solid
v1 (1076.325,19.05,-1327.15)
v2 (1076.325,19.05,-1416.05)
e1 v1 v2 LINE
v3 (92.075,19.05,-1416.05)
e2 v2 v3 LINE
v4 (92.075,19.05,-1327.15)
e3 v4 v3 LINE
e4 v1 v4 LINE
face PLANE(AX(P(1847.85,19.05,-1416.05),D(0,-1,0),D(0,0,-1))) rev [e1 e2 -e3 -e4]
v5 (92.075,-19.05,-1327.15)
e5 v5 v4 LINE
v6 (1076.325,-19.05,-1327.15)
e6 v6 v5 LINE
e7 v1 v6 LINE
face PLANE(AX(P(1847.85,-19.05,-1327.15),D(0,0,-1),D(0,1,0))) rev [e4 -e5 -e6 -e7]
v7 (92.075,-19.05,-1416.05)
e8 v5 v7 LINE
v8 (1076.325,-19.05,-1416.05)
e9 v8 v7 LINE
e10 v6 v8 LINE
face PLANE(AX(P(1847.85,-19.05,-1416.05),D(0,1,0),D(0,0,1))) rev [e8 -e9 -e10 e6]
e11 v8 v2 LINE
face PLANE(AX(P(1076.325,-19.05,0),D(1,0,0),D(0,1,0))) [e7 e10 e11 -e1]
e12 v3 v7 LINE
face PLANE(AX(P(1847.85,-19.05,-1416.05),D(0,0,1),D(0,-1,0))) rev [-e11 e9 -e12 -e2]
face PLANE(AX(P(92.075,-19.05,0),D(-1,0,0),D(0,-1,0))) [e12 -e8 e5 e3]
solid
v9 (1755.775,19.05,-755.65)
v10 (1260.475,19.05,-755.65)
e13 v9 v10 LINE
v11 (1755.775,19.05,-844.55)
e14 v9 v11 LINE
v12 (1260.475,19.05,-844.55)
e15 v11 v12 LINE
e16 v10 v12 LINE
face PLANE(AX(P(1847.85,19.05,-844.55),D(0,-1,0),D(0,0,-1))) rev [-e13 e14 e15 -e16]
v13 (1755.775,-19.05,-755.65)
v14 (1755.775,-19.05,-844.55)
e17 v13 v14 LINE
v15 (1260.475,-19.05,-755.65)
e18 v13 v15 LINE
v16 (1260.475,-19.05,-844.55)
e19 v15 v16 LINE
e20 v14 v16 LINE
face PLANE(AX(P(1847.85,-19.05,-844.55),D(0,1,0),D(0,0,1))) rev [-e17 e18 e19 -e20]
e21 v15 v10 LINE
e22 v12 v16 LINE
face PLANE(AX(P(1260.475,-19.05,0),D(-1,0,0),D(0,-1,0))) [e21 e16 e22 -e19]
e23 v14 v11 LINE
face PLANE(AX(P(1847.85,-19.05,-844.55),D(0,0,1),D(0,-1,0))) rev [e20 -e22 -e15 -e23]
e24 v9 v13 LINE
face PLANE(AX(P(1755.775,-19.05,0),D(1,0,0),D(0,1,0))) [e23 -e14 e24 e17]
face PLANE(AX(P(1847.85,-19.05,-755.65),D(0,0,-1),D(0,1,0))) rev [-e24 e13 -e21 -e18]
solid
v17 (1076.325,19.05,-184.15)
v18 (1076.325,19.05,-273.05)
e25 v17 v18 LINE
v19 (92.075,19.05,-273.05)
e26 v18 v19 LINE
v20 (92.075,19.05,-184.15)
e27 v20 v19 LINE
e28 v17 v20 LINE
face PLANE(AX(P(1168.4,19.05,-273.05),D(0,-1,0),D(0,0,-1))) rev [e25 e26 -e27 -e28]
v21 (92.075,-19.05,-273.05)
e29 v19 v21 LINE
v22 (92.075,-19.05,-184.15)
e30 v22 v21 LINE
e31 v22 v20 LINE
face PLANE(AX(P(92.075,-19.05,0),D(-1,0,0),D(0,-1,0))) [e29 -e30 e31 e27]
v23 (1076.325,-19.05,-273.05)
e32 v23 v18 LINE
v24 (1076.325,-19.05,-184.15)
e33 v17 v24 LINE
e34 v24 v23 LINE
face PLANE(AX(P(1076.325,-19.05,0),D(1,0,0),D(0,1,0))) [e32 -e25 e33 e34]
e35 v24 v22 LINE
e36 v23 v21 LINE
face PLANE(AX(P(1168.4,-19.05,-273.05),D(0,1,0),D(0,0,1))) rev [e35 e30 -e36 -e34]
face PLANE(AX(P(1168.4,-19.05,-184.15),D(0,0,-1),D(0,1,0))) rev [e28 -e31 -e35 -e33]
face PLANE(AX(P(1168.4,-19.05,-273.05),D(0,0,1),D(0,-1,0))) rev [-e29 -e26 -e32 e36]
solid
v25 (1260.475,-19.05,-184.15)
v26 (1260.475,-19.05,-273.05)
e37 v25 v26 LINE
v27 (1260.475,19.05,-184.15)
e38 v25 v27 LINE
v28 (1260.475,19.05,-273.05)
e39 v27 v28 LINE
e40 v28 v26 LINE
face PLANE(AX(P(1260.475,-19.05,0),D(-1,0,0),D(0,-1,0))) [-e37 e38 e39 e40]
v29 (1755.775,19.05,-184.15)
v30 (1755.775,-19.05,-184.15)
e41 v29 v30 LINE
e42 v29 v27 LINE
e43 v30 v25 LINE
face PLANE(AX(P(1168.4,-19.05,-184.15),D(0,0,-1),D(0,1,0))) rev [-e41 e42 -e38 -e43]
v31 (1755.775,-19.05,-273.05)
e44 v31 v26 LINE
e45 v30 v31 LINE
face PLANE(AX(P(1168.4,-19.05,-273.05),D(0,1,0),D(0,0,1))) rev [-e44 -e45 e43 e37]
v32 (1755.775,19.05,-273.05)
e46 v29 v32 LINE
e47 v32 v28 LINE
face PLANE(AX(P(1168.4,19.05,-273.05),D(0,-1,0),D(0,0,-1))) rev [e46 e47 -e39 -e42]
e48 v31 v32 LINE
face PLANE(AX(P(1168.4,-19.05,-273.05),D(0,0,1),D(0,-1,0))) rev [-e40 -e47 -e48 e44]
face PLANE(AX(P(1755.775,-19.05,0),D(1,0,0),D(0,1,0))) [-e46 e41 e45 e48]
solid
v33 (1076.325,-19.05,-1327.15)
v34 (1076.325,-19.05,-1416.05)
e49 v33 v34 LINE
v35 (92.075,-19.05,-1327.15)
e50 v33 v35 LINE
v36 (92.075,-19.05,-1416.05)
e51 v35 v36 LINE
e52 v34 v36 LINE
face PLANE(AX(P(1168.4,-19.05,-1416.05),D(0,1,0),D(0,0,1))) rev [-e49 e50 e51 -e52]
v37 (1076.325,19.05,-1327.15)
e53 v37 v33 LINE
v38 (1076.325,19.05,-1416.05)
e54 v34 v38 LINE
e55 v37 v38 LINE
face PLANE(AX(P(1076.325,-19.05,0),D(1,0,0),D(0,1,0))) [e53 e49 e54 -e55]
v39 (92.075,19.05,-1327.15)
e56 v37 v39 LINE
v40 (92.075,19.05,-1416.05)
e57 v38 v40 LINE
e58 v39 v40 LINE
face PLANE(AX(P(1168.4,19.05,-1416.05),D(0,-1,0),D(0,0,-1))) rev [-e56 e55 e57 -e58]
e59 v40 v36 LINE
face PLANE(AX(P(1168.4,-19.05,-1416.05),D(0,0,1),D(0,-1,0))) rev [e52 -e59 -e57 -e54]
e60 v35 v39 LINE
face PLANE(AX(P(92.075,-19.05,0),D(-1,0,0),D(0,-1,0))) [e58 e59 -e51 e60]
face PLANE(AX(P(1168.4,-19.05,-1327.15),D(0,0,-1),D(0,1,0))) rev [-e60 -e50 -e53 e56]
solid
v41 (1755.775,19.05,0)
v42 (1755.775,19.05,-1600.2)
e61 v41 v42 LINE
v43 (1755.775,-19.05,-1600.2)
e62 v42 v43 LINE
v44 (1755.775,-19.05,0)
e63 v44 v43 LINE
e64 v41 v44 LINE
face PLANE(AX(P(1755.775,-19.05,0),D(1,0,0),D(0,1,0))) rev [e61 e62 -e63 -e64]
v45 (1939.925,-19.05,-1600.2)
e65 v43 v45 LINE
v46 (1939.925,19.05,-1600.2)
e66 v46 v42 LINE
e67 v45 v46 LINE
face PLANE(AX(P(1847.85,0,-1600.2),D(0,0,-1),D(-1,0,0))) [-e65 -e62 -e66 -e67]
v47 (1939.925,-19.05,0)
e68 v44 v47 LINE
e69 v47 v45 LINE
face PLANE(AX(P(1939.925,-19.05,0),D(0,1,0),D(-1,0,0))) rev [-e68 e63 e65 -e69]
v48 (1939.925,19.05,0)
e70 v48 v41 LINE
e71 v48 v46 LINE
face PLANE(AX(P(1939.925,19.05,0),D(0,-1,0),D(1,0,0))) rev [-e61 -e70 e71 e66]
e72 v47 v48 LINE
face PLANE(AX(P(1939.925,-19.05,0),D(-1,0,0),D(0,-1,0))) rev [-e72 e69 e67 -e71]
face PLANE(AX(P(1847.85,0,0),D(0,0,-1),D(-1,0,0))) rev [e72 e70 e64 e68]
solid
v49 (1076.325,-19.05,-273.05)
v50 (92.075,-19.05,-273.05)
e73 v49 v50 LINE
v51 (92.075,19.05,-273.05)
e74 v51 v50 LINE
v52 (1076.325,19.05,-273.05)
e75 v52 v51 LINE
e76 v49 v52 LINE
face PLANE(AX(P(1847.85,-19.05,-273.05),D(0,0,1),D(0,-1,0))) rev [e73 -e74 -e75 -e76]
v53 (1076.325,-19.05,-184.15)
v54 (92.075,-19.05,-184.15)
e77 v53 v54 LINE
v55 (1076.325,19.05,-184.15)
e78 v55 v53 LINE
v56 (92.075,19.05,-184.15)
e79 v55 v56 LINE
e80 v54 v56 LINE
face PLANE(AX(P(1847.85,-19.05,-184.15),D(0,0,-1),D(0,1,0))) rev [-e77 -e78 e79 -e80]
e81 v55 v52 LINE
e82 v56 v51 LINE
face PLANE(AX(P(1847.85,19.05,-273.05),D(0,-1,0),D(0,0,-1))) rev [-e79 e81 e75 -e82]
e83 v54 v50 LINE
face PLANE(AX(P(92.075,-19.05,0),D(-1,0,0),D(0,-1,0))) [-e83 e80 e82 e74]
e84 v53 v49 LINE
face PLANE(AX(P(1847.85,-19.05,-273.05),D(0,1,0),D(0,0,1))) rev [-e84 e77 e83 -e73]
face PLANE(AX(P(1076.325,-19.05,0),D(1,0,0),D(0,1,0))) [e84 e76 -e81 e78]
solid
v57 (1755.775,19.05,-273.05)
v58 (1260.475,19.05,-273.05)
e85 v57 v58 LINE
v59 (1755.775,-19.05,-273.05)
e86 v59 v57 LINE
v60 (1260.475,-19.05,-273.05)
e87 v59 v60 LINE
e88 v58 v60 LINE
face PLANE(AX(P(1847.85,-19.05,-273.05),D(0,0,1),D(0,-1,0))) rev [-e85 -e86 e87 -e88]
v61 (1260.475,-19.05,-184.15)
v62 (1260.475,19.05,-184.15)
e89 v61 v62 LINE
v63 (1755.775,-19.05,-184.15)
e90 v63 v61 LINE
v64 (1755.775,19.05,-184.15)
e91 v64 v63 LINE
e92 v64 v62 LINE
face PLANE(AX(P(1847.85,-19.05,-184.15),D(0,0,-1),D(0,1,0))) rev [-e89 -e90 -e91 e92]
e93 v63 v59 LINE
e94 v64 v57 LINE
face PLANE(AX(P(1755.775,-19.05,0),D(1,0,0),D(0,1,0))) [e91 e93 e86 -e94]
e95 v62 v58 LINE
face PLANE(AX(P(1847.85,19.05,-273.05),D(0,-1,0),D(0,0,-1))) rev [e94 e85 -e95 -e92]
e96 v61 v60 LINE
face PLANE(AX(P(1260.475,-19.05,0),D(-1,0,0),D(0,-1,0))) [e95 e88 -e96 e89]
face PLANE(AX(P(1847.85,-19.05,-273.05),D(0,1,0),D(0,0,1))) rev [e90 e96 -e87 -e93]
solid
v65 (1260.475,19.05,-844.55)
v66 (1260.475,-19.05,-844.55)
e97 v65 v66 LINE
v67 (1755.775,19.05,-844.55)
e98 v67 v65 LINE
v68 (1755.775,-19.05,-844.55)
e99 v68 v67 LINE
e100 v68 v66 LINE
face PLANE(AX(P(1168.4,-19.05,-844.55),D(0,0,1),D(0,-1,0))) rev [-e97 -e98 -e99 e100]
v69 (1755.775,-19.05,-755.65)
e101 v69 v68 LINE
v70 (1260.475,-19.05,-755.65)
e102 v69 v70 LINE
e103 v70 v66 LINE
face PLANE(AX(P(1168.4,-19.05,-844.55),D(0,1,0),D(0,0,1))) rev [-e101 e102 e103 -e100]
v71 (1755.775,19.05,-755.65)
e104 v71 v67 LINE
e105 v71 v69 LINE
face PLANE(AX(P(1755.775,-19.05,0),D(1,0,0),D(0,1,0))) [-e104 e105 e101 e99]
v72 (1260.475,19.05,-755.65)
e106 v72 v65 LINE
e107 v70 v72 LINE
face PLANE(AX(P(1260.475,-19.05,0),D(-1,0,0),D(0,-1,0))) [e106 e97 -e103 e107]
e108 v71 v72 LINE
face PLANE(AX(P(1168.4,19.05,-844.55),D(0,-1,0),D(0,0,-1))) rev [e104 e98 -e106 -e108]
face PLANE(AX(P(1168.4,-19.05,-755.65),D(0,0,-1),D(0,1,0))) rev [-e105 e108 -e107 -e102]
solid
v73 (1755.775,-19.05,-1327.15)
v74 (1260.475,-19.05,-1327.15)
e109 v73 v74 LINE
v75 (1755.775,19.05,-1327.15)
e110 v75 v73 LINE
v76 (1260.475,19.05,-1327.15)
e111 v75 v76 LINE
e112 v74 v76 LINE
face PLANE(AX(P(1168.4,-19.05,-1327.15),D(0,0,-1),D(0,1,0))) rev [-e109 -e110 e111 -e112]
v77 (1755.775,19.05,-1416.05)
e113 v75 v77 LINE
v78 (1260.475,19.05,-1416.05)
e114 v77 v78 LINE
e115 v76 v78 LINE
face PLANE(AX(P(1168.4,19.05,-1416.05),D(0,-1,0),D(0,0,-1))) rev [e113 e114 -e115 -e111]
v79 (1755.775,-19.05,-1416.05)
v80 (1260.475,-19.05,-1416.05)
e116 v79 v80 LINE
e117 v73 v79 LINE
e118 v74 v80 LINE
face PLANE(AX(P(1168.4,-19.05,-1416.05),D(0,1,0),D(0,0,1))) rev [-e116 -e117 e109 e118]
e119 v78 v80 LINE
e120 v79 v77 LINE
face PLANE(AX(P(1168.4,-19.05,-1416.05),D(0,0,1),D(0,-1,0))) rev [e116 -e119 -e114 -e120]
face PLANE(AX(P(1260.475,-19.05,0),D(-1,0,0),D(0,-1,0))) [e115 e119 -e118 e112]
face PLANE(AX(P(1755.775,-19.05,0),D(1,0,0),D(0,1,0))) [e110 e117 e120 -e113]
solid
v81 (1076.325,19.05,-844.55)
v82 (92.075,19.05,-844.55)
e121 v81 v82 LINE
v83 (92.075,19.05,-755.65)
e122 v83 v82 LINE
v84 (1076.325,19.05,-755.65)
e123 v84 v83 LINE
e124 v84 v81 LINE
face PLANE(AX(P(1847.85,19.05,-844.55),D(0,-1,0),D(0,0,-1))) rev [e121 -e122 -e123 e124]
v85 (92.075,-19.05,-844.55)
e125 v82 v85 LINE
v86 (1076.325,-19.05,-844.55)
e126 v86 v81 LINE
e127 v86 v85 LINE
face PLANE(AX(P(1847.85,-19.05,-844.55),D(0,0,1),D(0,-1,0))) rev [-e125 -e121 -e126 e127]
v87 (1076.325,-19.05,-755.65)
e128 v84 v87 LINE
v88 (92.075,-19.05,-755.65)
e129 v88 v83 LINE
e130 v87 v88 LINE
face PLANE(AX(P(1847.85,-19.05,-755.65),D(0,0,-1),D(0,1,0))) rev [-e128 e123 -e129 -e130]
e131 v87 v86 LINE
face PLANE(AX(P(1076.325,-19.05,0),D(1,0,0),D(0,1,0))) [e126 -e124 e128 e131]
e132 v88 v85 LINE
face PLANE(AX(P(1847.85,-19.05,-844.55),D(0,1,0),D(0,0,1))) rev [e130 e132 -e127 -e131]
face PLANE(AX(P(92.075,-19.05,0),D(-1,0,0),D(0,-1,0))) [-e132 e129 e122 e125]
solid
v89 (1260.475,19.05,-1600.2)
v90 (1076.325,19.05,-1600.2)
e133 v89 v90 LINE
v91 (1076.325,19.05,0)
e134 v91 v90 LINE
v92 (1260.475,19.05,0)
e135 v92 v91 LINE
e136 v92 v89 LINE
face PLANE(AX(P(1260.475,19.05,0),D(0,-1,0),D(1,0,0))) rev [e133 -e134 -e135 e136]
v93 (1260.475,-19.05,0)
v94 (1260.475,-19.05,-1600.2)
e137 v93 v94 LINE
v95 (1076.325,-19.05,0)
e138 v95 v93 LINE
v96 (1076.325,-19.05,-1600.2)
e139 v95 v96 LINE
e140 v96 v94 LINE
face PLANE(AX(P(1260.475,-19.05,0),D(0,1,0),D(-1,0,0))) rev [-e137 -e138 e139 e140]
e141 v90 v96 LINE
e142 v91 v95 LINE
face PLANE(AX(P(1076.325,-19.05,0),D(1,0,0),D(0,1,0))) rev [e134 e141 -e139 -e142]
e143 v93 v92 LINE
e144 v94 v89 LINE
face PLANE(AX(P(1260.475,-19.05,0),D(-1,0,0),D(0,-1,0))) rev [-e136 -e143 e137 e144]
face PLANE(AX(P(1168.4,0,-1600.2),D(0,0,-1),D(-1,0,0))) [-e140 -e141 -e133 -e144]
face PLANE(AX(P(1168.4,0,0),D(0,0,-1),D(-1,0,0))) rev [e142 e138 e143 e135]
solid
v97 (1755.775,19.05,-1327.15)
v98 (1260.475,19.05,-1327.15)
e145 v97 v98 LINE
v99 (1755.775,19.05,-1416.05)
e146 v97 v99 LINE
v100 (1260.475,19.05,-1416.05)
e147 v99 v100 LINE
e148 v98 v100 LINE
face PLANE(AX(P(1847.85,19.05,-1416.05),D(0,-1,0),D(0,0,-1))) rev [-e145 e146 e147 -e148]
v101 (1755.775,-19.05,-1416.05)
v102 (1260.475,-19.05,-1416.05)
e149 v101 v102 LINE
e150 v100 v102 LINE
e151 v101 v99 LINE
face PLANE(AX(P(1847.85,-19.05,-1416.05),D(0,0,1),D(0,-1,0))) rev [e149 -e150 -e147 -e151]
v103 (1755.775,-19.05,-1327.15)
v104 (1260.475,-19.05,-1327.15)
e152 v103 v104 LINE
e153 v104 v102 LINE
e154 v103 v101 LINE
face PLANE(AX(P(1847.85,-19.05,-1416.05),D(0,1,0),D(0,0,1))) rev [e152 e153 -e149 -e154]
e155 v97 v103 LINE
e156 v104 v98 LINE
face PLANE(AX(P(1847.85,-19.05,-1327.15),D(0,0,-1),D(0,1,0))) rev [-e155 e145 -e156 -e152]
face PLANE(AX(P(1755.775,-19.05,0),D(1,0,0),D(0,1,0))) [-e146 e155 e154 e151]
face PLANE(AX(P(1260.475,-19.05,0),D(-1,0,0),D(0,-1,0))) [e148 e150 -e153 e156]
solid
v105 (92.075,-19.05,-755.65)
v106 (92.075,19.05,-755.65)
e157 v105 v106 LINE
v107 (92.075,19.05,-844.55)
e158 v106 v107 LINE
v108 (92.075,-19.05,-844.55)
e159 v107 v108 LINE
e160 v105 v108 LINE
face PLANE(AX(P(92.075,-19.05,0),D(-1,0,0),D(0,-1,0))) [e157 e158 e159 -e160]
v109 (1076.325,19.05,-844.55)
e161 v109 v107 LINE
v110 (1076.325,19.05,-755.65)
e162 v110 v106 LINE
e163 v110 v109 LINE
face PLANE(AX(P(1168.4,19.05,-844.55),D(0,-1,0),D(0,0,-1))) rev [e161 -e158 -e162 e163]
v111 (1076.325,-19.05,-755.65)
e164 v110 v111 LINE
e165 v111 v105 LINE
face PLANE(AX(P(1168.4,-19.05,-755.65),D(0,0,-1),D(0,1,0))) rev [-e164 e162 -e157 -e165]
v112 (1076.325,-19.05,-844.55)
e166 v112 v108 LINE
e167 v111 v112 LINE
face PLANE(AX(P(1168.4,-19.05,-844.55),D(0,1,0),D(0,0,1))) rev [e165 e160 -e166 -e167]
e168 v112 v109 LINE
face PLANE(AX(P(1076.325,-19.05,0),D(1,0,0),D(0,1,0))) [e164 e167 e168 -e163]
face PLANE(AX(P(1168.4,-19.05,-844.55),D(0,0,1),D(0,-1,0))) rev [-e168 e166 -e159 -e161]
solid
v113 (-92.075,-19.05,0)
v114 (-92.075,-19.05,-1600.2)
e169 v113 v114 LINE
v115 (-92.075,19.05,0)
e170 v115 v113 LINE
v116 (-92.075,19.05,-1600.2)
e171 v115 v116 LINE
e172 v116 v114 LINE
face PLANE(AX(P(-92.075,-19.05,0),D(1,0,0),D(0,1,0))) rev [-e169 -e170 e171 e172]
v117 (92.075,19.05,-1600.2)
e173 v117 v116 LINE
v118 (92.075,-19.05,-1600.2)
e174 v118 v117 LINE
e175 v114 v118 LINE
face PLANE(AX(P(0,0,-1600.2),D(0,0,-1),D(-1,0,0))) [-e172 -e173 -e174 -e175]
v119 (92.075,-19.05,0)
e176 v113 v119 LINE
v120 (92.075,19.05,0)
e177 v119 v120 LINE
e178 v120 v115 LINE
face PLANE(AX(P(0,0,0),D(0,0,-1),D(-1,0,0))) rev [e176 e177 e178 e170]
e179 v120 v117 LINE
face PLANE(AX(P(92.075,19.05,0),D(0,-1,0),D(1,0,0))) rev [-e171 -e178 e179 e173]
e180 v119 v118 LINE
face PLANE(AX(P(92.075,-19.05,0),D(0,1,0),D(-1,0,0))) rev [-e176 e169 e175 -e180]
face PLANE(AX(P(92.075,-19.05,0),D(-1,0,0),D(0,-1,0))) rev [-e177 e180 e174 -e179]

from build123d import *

# Parameters (mm, degrees)
SKETCH112_W                            = 38.1
SKETCH112_H                            = 88.9
WOODEN_STUD_CONFIGURED_2_X_4_2_DEPTH   = 1168.4
SKETCH112_ON_SEGMENT_2_W               = 38.1
SKETCH112_ON_SEGMENT_2_H               = 88.9
WOODEN_STUD_CONFIGURED_2_X_4_2_2_DEPTH = 1168.4
SKETCH112_ON_SEGMENT_3_W               = 38.1
SKETCH112_ON_SEGMENT_3_H               = 88.9
WOODEN_STUD_CONFIGURED_2_X_4_2_3_DEPTH = 1168.4
SKETCH112_ON_SEGMENT_4_W               = 38.1
SKETCH112_ON_SEGMENT_4_H               = 88.9
WOODEN_STUD_CONFIGURED_2_X_4_2_4_DEPTH = 679.45
SKETCH112_ON_SEGMENT_5_W               = 38.1
SKETCH112_ON_SEGMENT_5_H               = 88.9
WOODEN_STUD_CONFIGURED_2_X_4_2_5_DEPTH = 679.45
SKETCH112_ON_SEGMENT_6_W               = 38.1
SKETCH112_ON_SEGMENT_6_H               = 88.9
WOODEN_STUD_CONFIGURED_2_X_4_2_6_DEPTH = 679.45
SKETCH114_W                            = 38.1
SKETCH114_H                            = 184.15
WOODEN_STUD_CONFIGURED_2_X_8_3_DEPTH   = 1600.2
SKETCH114_ON_SEGMENT_2_W               = 38.1
SKETCH114_ON_SEGMENT_2_H               = 184.15
WOODEN_STUD_CONFIGURED_2_X_8_3_2_DEPTH = 1600.2
SKETCH114_ON_SEGMENT_3_W               = 38.1
SKETCH114_ON_SEGMENT_3_H               = 184.15
WOODEN_STUD_CONFIGURED_2_X_8_3_3_DEPTH = 1600.2
TRIM_EXTEND3_START                     = 1168.4
TRIM_EXTEND3_OUTLINE_W                 = 38.1
TRIM_EXTEND3_OUTLINE_H                 = 88.9
TRIM_EXTEND3_DEPTH                     = 92.075
TRIM_EXTEND3_START_2                   = 1755.775
TRIM_EXTEND3_2_OUTLINE_W               = 38.1
TRIM_EXTEND3_2_OUTLINE_H               = 88.9
TRIM_EXTEND3_2_DEPTH                   = 92.075
TRIM_EXTEND3_3_OUTLINE_W               = 38.1
TRIM_EXTEND3_3_OUTLINE_H               = 88.9
TRIM_EXTEND3_3_DEPTH                   = 92.075
TRIM_EXTEND3_START_3                   = 1076.325
TRIM_EXTEND3_4_OUTLINE_W               = 38.1
TRIM_EXTEND3_4_OUTLINE_H               = 88.9
TRIM_EXTEND3_4_DEPTH                   = 92.075
TRIM_EXTEND3_5_OUTLINE_W               = 38.1
TRIM_EXTEND3_5_OUTLINE_H               = 88.9
TRIM_EXTEND3_5_DEPTH                   = 92.075
TRIM_EXTEND3_6_OUTLINE_W               = 38.1
TRIM_EXTEND3_6_OUTLINE_H               = 88.9
TRIM_EXTEND3_6_DEPTH                   = 92.075
TRIM_EXTEND3_7_OUTLINE_W               = 38.1
TRIM_EXTEND3_7_OUTLINE_H               = 88.9
TRIM_EXTEND3_7_DEPTH                   = 92.075
TRIM_EXTEND3_8_OUTLINE_W               = 38.1
TRIM_EXTEND3_8_OUTLINE_H               = 88.9
TRIM_EXTEND3_8_DEPTH                   = 92.075
TRIM_EXTEND3_9_OUTLINE_W               = 38.1
TRIM_EXTEND3_9_OUTLINE_H               = 88.9
TRIM_EXTEND3_9_DEPTH                   = 92.075
TRIM_EXTEND3_10_OUTLINE_W              = 38.1
TRIM_EXTEND3_10_OUTLINE_H              = 88.9
TRIM_EXTEND3_10_DEPTH                  = 92.075
TRIM_EXTEND3_11_OUTLINE_W              = 38.1
TRIM_EXTEND3_11_OUTLINE_H              = 88.9
TRIM_EXTEND3_11_DEPTH                  = 92.075
TRIM_EXTEND3_12_OUTLINE_W              = 38.1
TRIM_EXTEND3_12_OUTLINE_H              = 88.9
TRIM_EXTEND3_12_DEPTH                  = 92.075
TRIM_EXTEND3_START_4                   = -273.05
TRIM_EXTEND3_13_OUTLINE_W              = 495.3
TRIM_EXTEND3_13_OUTLINE_H              = 38.1
TRIM_EXTEND3_13_DEPTH                  = 88.9
TRIM_EXTEND3_14_OUTLINE_W              = 984.25
TRIM_EXTEND3_14_OUTLINE_H              = 38.1
TRIM_EXTEND3_14_DEPTH                  = 88.9
TRIM_EXTEND3_START_5                   = -844.55
TRIM_EXTEND3_15_OUTLINE_W              = 495.3
TRIM_EXTEND3_15_OUTLINE_H              = 38.1
TRIM_EXTEND3_15_DEPTH                  = 88.9
TRIM_EXTEND3_16_OUTLINE_W              = 984.25
TRIM_EXTEND3_16_OUTLINE_H              = 38.1
TRIM_EXTEND3_16_DEPTH                  = 88.9
TRIM_EXTEND3_START_6                   = -1416.05
TRIM_EXTEND3_17_OUTLINE_W              = 495.3
TRIM_EXTEND3_17_OUTLINE_H              = 38.1
TRIM_EXTEND3_17_DEPTH                  = 88.9
TRIM_EXTEND3_18_OUTLINE_W              = 984.25
TRIM_EXTEND3_18_OUTLINE_H              = 38.1
TRIM_EXTEND3_18_DEPTH                  = 88.9


# Read off the part's stored shape, not the designer's step: Trim/Extend3
with BuildPart() as part:
    # Sketch112 → Wooden-stud - configured 2 X 4(2) (new body)
    with BuildSketch(Plane(origin=(0, 0, -228.6), x_dir=(0, 1, 0), z_dir=(1, 0, 0))):
        Rectangle(SKETCH112_W, SKETCH112_H)
    extrude(amount=WOODEN_STUD_CONFIGURED_2_X_4_2_DEPTH)

    # Trim_Extend3 3 outline → Trim_Extend3 3 (cut)
    with BuildSketch(Plane.YZ):
        with Locations((0, -228.6)):
            Rectangle(TRIM_EXTEND3_3_OUTLINE_W, TRIM_EXTEND3_3_OUTLINE_H)
    extrude(amount=TRIM_EXTEND3_3_DEPTH, mode=Mode.SUBTRACT)

    # Trim_Extend3 4 outline → Trim_Extend3 4 (cut)
    with BuildSketch(Plane.YZ.offset(TRIM_EXTEND3_START_3)):
        with Locations((0, -228.6)):
            Rectangle(TRIM_EXTEND3_4_OUTLINE_W, TRIM_EXTEND3_4_OUTLINE_H)
    extrude(amount=TRIM_EXTEND3_4_DEPTH, mode=Mode.SUBTRACT)


with BuildPart() as body_2:
    # Sketch112 on segment 2 (carried to segment 2) → Wooden-stud - configured 2 X 4_2 2 (new body)
    with BuildSketch(Plane(origin=(0, 0, -800.1), x_dir=(0, 1, 0), z_dir=(1, 0, 0))):
        Rectangle(SKETCH112_ON_SEGMENT_2_W, SKETCH112_ON_SEGMENT_2_H)
    extrude(amount=WOODEN_STUD_CONFIGURED_2_X_4_2_2_DEPTH)

    # Trim_Extend3 7 outline → Trim_Extend3 7 (cut)
    with BuildSketch(Plane.YZ):
        with Locations((0, -800.1)):
            Rectangle(TRIM_EXTEND3_7_OUTLINE_W, TRIM_EXTEND3_7_OUTLINE_H)
    extrude(amount=TRIM_EXTEND3_7_DEPTH, mode=Mode.SUBTRACT)

    # Trim_Extend3 8 outline → Trim_Extend3 8 (cut)
    with BuildSketch(Plane.YZ.offset(TRIM_EXTEND3_START_3)):
        with Locations((0, -800.1)):
            Rectangle(TRIM_EXTEND3_8_OUTLINE_W, TRIM_EXTEND3_8_OUTLINE_H)
    extrude(amount=TRIM_EXTEND3_8_DEPTH, mode=Mode.SUBTRACT)


with BuildPart() as body_3:
    # Sketch112 on segment 3 (carried to segment 3) → Wooden-stud - configured 2 X 4_2 3 (new body)
    with BuildSketch(Plane(origin=(0, 0, -1371.6), x_dir=(0, 1, 0), z_dir=(1, 0, 0))):
        Rectangle(SKETCH112_ON_SEGMENT_3_W, SKETCH112_ON_SEGMENT_3_H)
    extrude(amount=WOODEN_STUD_CONFIGURED_2_X_4_2_3_DEPTH)

    # Trim_Extend3 11 outline → Trim_Extend3 11 (cut)
    with BuildSketch(Plane.YZ):
        with Locations((0, -1371.6)):
            Rectangle(TRIM_EXTEND3_11_OUTLINE_W, TRIM_EXTEND3_11_OUTLINE_H)
    extrude(amount=TRIM_EXTEND3_11_DEPTH, mode=Mode.SUBTRACT)

    # Trim_Extend3 12 outline → Trim_Extend3 12 (cut)
    with BuildSketch(Plane.YZ.offset(TRIM_EXTEND3_START_3)):
        with Locations((0, -1371.6)):
            Rectangle(TRIM_EXTEND3_12_OUTLINE_W, TRIM_EXTEND3_12_OUTLINE_H)
    extrude(amount=TRIM_EXTEND3_12_DEPTH, mode=Mode.SUBTRACT)


with BuildPart() as body_4:
    # Sketch112 on segment 4 (carried to segment 4) → Wooden-stud - configured 2 X 4_2 4 (new body)
    with BuildSketch(Plane(origin=(1168.4, 0, -1371.6), x_dir=(0, 1, 0), z_dir=(1, 0, 0))):
        Rectangle(SKETCH112_ON_SEGMENT_4_W, SKETCH112_ON_SEGMENT_4_H)
    extrude(amount=WOODEN_STUD_CONFIGURED_2_X_4_2_4_DEPTH)

    # Trim_Extend3 9 outline → Trim_Extend3 9 (cut)
    with BuildSketch(Plane.YZ.offset(TRIM_EXTEND3_START)):
        with Locations((0, -1371.6)):
            Rectangle(TRIM_EXTEND3_9_OUTLINE_W, TRIM_EXTEND3_9_OUTLINE_H)
    extrude(amount=TRIM_EXTEND3_9_DEPTH, mode=Mode.SUBTRACT)

    # Trim_Extend3 10 outline → Trim_Extend3 10 (cut)
    with BuildSketch(Plane.YZ.offset(TRIM_EXTEND3_START_2)):
        with Locations((0, -1371.6)):
            Rectangle(TRIM_EXTEND3_10_OUTLINE_W, TRIM_EXTEND3_10_OUTLINE_H)
    extrude(amount=TRIM_EXTEND3_10_DEPTH, mode=Mode.SUBTRACT)


with BuildPart() as body_5:
    # Sketch112 on segment 5 (carried to segment 5) → Wooden-stud - configured 2 X 4_2 5 (new body)
    with BuildSketch(Plane(origin=(1168.4, 0, -800.1), x_dir=(0, 1, 0), z_dir=(1, 0, 0))):
        Rectangle(SKETCH112_ON_SEGMENT_5_W, SKETCH112_ON_SEGMENT_5_H)
    extrude(amount=WOODEN_STUD_CONFIGURED_2_X_4_2_5_DEPTH)

    # Trim_Extend3 5 outline → Trim_Extend3 5 (cut)
    with BuildSketch(Plane.YZ.offset(TRIM_EXTEND3_START)):
        with Locations((0, -800.1)):
            Rectangle(TRIM_EXTEND3_5_OUTLINE_W, TRIM_EXTEND3_5_OUTLINE_H)
    extrude(amount=TRIM_EXTEND3_5_DEPTH, mode=Mode.SUBTRACT)

    # Trim_Extend3 6 outline → Trim_Extend3 6 (cut)
    with BuildSketch(Plane.YZ.offset(TRIM_EXTEND3_START_2)):
        with Locations((0, -800.1)):
            Rectangle(TRIM_EXTEND3_6_OUTLINE_W, TRIM_EXTEND3_6_OUTLINE_H)
    extrude(amount=TRIM_EXTEND3_6_DEPTH, mode=Mode.SUBTRACT)


with BuildPart() as body_6:
    # Sketch112 on segment 6 (carried to segment 6) → Wooden-stud - configured 2 X 4_2 6 (new body)
    with BuildSketch(Plane(origin=(1168.4, 0, -228.6), x_dir=(0, 1, 0), z_dir=(1, 0, 0))):
        Rectangle(SKETCH112_ON_SEGMENT_6_W, SKETCH112_ON_SEGMENT_6_H)
    extrude(amount=WOODEN_STUD_CONFIGURED_2_X_4_2_6_DEPTH)

    # Trim/Extend3 outline → Trim/Extend3 (cut)
    with BuildSketch(Plane.YZ.offset(TRIM_EXTEND3_START)):
        with Locations((0, -228.6)):
            Rectangle(TRIM_EXTEND3_OUTLINE_W, TRIM_EXTEND3_OUTLINE_H)
    extrude(amount=TRIM_EXTEND3_DEPTH, mode=Mode.SUBTRACT)

    # Trim_Extend3 2 outline → Trim_Extend3 2 (cut)
    with BuildSketch(Plane.YZ.offset(TRIM_EXTEND3_START_2)):
        with Locations((0, -228.6)):
            Rectangle(TRIM_EXTEND3_2_OUTLINE_W, TRIM_EXTEND3_2_OUTLINE_H)
    extrude(amount=TRIM_EXTEND3_2_DEPTH, mode=Mode.SUBTRACT)


with BuildPart() as body_7:
    # Sketch114 → Wooden-stud - configured 2 X 8(3) (new body)
    with BuildSketch(Plane(origin=(0, 0, -1600.2), x_dir=(0, 1, 0), z_dir=(0, 0, 1))):
        Rectangle(SKETCH114_W, SKETCH114_H)
    extrude(amount=WOODEN_STUD_CONFIGURED_2_X_8_3_DEPTH)


with BuildPart() as body_8:
    # Sketch114 on segment 2 (carried to segment 2) → Wooden-stud - configured 2 X 8_3 2 (new body)
    with BuildSketch(Plane(origin=(1168.4, 0, -1600.2), x_dir=(0, 1, 0), z_dir=(0, 0, 1))):
        Rectangle(SKETCH114_ON_SEGMENT_2_W, SKETCH114_ON_SEGMENT_2_H)
    extrude(amount=WOODEN_STUD_CONFIGURED_2_X_8_3_2_DEPTH)


with BuildPart() as body_9:
    # Sketch114 on segment 3 (carried to segment 3) → Wooden-stud - configured 2 X 8_3 3 (new body)
    with BuildSketch(Plane(origin=(1847.85, 0, -1600.2), x_dir=(0, 1, 0), z_dir=(0, 0, 1))):
        Rectangle(SKETCH114_ON_SEGMENT_3_W, SKETCH114_ON_SEGMENT_3_H)
    extrude(amount=WOODEN_STUD_CONFIGURED_2_X_8_3_3_DEPTH)


with BuildPart() as body_10:
    # Trim_Extend3 13 outline → Trim_Extend3 13 (new body)
    with BuildSketch(Plane.XY.offset(TRIM_EXTEND3_START_4)):
        with Locations((1508.125, 0)):
            Rectangle(TRIM_EXTEND3_13_OUTLINE_W, TRIM_EXTEND3_13_OUTLINE_H)
    extrude(amount=TRIM_EXTEND3_13_DEPTH)


with BuildPart() as body_11:
    # Trim_Extend3 14 outline → Trim_Extend3 14 (new body)
    with BuildSketch(Plane.XY.offset(TRIM_EXTEND3_START_4)):
        with Locations((584.2, 0)):
            Rectangle(TRIM_EXTEND3_14_OUTLINE_W, TRIM_EXTEND3_14_OUTLINE_H)
    extrude(amount=TRIM_EXTEND3_14_DEPTH)


with BuildPart() as body_12:
    # Trim_Extend3 15 outline → Trim_Extend3 15 (new body)
    with BuildSketch(Plane.XY.offset(TRIM_EXTEND3_START_5)):
        with Locations((1508.125, 0)):
            Rectangle(TRIM_EXTEND3_15_OUTLINE_W, TRIM_EXTEND3_15_OUTLINE_H)
    extrude(amount=TRIM_EXTEND3_15_DEPTH)


with BuildPart() as body_13:
    # Trim_Extend3 16 outline → Trim_Extend3 16 (new body)
    with BuildSketch(Plane.XY.offset(TRIM_EXTEND3_START_5)):
        with Locations((584.2, 0)):
            Rectangle(TRIM_EXTEND3_16_OUTLINE_W, TRIM_EXTEND3_16_OUTLINE_H)
    extrude(amount=TRIM_EXTEND3_16_DEPTH)


with BuildPart() as body_14:
    # Trim_Extend3 17 outline → Trim_Extend3 17 (new body)
    with BuildSketch(Plane.XY.offset(TRIM_EXTEND3_START_6)):
        with Locations((1508.125, 0)):
            Rectangle(TRIM_EXTEND3_17_OUTLINE_W, TRIM_EXTEND3_17_OUTLINE_H)
    extrude(amount=TRIM_EXTEND3_17_DEPTH)


with BuildPart() as body_15:
    # Trim_Extend3 18 outline → Trim_Extend3 18 (new body)
    with BuildSketch(Plane.XY.offset(TRIM_EXTEND3_START_6)):
        with Locations((584.2, 0)):
            Rectangle(TRIM_EXTEND3_18_OUTLINE_W, TRIM_EXTEND3_18_OUTLINE_H)
    extrude(amount=TRIM_EXTEND3_18_DEPTH)


solid = Compound([part.part, body_2.part, body_3.part, body_4.part, body_5.part, body_6.part, body_7.part, body_8.part, body_9.part, body_10.part, body_11.part, body_12.part, body_13.part, body_14.part, body_15.part])
